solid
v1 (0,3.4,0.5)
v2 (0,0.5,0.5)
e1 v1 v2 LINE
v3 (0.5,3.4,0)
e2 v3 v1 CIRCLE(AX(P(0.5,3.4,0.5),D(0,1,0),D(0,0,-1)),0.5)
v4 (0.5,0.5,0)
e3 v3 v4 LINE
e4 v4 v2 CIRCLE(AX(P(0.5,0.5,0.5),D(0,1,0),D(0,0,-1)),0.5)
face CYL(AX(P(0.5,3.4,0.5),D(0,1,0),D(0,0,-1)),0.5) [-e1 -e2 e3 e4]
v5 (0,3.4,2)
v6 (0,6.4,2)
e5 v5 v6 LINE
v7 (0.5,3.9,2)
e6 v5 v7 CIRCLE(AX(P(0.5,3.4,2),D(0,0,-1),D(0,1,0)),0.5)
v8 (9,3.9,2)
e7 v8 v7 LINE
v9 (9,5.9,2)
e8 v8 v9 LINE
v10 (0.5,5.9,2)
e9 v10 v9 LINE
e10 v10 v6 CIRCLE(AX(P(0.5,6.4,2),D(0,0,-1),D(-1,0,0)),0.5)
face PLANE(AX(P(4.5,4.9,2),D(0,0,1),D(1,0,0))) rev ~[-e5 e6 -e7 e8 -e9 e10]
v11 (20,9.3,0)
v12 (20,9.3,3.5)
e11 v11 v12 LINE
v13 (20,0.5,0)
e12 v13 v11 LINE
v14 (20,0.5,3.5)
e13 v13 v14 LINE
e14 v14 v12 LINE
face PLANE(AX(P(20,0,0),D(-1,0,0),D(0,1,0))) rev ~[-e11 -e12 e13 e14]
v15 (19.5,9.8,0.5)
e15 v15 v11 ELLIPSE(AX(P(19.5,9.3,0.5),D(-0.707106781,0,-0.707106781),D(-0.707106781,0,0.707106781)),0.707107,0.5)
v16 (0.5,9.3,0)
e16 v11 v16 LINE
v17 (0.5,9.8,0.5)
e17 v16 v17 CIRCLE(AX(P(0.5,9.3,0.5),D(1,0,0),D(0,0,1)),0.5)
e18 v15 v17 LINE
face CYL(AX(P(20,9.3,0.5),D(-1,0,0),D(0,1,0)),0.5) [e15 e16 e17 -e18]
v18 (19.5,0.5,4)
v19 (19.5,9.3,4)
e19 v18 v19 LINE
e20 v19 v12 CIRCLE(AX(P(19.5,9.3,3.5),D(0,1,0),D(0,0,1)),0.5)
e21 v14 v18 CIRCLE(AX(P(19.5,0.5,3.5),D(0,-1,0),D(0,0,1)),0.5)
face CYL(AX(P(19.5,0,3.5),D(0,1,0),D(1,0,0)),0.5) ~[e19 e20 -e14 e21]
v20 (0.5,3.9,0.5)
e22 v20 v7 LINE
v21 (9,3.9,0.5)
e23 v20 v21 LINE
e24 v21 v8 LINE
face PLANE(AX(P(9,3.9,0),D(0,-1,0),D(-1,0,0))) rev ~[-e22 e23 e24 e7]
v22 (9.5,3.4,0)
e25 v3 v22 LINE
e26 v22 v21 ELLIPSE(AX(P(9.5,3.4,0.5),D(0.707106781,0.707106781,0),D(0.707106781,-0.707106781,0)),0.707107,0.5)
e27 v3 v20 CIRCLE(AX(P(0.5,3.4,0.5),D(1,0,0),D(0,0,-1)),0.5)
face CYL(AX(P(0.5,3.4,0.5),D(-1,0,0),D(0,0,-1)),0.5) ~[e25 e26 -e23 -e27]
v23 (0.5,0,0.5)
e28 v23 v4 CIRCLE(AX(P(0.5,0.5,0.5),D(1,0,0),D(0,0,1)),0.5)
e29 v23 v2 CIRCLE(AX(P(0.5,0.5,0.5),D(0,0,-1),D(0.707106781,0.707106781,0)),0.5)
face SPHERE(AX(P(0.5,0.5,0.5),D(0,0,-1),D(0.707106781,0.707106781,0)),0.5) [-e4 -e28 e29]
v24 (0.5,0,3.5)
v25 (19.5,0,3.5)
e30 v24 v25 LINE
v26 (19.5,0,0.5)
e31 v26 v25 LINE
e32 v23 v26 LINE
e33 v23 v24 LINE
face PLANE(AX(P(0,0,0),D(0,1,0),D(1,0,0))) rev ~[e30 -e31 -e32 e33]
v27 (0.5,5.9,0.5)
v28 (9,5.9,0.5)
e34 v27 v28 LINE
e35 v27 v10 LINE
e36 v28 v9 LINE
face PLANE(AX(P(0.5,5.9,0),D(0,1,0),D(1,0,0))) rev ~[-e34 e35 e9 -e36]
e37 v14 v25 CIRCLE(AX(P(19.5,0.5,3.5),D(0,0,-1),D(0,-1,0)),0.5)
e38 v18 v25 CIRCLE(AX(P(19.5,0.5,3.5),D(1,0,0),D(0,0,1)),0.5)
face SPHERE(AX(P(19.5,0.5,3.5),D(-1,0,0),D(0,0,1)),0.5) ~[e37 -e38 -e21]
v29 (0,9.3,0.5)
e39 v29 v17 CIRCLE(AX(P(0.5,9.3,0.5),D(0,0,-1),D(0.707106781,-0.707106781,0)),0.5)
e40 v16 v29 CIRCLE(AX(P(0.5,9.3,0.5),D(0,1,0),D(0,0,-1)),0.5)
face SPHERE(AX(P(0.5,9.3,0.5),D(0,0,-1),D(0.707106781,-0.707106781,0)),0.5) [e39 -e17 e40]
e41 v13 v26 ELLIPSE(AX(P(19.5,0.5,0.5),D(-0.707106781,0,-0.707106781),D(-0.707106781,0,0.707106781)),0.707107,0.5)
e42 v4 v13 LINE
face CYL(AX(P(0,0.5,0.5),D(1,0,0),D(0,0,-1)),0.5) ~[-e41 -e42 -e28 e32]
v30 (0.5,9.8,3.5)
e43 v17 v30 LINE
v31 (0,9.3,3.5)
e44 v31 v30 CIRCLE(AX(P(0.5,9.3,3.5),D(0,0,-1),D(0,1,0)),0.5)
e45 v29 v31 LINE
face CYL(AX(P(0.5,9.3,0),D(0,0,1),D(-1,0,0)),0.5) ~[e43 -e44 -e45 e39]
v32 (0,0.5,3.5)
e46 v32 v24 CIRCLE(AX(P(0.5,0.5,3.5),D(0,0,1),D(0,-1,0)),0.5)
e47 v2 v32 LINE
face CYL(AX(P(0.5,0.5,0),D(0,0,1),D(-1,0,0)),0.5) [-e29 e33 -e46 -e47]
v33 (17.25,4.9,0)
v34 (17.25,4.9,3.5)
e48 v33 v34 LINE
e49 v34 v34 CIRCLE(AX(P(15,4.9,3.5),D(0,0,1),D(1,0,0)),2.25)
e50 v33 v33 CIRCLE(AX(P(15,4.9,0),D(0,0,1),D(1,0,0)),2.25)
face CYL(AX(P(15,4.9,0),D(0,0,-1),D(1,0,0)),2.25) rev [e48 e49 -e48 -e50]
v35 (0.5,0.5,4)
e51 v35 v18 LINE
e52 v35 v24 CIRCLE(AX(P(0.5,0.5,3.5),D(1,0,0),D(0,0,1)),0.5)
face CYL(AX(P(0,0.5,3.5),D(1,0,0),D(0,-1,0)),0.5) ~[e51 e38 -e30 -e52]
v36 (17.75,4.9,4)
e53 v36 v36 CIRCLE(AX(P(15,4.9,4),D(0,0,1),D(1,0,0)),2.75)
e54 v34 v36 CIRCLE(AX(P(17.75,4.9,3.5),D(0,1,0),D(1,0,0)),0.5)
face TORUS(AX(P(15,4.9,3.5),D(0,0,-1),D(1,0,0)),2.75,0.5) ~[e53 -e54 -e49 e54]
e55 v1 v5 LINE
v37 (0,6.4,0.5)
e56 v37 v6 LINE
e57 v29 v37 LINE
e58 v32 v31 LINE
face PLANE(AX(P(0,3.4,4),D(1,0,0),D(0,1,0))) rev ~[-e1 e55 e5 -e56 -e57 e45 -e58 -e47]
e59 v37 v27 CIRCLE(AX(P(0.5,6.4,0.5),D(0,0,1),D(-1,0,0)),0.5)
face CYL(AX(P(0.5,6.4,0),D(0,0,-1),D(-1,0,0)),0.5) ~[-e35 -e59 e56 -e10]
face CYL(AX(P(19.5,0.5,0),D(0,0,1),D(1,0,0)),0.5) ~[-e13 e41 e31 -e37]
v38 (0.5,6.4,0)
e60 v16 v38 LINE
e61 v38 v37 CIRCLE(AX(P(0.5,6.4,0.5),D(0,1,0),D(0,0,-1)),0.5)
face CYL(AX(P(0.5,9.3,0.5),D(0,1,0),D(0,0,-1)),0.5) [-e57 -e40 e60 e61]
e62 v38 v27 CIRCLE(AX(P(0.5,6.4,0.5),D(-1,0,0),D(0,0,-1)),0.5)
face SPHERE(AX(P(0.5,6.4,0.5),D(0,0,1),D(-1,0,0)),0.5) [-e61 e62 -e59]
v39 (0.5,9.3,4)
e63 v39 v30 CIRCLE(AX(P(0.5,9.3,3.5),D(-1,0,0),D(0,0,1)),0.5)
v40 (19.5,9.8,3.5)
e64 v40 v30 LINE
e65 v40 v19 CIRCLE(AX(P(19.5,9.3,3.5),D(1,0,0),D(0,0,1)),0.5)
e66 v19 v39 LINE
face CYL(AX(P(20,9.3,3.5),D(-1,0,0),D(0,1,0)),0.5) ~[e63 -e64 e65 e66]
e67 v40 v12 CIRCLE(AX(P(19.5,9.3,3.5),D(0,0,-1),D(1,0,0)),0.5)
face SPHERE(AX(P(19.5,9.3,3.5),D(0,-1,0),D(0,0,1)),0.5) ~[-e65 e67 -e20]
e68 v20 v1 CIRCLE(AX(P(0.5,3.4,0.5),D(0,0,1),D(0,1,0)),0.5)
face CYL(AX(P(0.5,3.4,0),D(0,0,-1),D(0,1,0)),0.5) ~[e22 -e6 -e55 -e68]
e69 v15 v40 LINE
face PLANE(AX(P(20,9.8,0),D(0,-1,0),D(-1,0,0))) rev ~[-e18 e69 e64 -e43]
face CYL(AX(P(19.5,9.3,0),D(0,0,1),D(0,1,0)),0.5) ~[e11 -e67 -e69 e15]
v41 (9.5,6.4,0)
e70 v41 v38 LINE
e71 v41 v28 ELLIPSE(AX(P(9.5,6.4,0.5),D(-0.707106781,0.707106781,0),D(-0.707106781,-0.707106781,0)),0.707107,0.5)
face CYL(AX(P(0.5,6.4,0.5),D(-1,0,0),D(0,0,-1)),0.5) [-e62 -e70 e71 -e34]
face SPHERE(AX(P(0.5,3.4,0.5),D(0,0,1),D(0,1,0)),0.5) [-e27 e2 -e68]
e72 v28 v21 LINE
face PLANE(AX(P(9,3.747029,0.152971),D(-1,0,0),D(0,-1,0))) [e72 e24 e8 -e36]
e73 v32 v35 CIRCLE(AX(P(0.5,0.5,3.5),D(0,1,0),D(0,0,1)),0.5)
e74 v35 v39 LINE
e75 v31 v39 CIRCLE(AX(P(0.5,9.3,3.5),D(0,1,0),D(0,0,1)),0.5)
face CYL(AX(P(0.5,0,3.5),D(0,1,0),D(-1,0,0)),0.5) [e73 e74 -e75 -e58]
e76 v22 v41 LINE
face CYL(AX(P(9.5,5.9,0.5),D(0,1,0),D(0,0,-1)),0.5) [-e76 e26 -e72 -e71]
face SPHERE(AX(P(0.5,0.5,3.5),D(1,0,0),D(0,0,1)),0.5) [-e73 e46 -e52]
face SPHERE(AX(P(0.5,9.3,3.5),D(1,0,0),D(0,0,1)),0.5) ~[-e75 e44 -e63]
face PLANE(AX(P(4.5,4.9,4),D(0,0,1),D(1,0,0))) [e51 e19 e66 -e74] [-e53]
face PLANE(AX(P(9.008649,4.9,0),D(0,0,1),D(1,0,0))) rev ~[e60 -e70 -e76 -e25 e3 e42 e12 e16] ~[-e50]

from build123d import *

# Parameters (mm, degrees)
F0_R         = 2.25
F1_DEPTH     = 4
F2_W         = 9
F2_H         = 3
F3_DEPTH     = 2
F4_R         = 0.5
F5_T1_DEPTH  = 8.5
F5_T3_DEPTH  = 2
F5_T5_DEPTH  = 2.9
F5_T7_DEPTH  = 2.9
F5_S11_W     = 0.5
F5_S11_H     = 0.5
F5_T12_DEPTH = 0.5
F5_S17_W     = 0.5
F5_S17_H     = 0.5
F5_T18_DEPTH = 0.5
F5_T22_ANGLE = 90
F5_T24_ANGLE = 90
F5_T29_DEPTH = 9.75
F5_T33_DEPTH = 3.25
F5_T40_DEPTH = 9.75
F5_T44_DEPTH = 3.25


# Not quite as in the source:
# - a fillet or chamfer that OpenCascade refuses, or shapes differently, is made with other operations: its cross-section is extruded or revolved along the edge and cut away or added


with BuildPart() as f1:
    # F0 (on Top) → F1 (new body)
    with BuildSketch(Plane.XY):
        with BuildLine():
            Line((20, 0), (20, 9.8))
            Line((20, 9.8), (0, 9.8))
            Line((0, 9.8), (0, 6.4))
            ThreePointArc((0, 6.4), (0.1464466094, 6.0464466094), (0.5, 5.9))
            Line((0.5, 5.9), (9, 5.9))
            Line((9, 5.9), (9, 3.9))
            Line((9, 3.9), (0.5, 3.9))
            ThreePointArc((0.5, 3.9), (0.1464466094, 3.7535533906), (0, 3.4))
            Line((0, 3.4), (0, 0))
            Line((0, 0), (20, 0))
        make_face()
        with Locations((15, 4.9)):
            Circle(F0_R, mode=Mode.SUBTRACT)
    extrude(amount=F1_DEPTH)

    # F2 (on face) → F3 (join)
    with BuildSketch(Plane.XY.offset(4)):
        with Locations((4.5, 4.9)):
            Rectangle(F2_W, F2_H)
    extrude(amount=-F3_DEPTH)

    # F4
    f4_edges = [f1.edges().sort_by_distance(p)[0] for p in [
        (10, 0, 4),
        (20, 4.9, 4),
        (10, 9.8, 4),
        (0, 4.9, 4),
        (12.75, 4.9, 4),
        (20, 9.8, 2),
        (0, 9.8, 2),
        (10, 9.8, 0),
        (0, 0, 2),
        (20, 0, 2),
        (10, 0, 0),
    ]]
    fillet(f4_edges, radius=F4_R)

    # F5: fillet of radius 0.5 on 3 edges, made by hand

    # F5_s2 → F5_t1 (cut)
    with BuildSketch(Plane.YZ.offset(0.5)):
        with BuildLine():
            ThreePointArc((6.4, 0), (6.0464466094, 0.1464466094), (5.9, 0.5))
            Line((5.9, 0.5), (5.9, 0))
            Line((5.9, 0), (6.4, 0))
        make_face()
        with BuildLine():
            ThreePointArc((3.4, 0), (3.7535533906, 0.1464466094), (3.9, 0.5))
            Line((3.9, 0.5), (3.9, 0))
            Line((3.9, 0), (3.4, 0))
        make_face()
    extrude(amount=F5_T1_DEPTH, mode=Mode.SUBTRACT)

    # F5_s4 → F5_t3 (cut)
    with BuildSketch(Plane.XZ.offset(-5.9)):
        with BuildLine():
            ThreePointArc((9.5, 0), (9.1464466094, 0.1464466094), (9, 0.5))
            Line((9, 0.5), (9, 0))
            Line((9, 0), (9.5, 0))
        make_face()
    extrude(amount=F5_T3_DEPTH, mode=Mode.SUBTRACT)

    # F5_s6 → F5_t5 (cut)
    with BuildSketch(Plane.XZ.offset(-3.4)):
        with BuildLine():
            ThreePointArc((0.5, 0), (0.1464466094, 0.1464466094), (0, 0.5))
            Line((0, 0.5), (0, 0))
            Line((0, 0), (0.5, 0))
        make_face()
    extrude(amount=F5_T5_DEPTH, mode=Mode.SUBTRACT)

    # F5_s8 → F5_t7 (cut)
    with BuildSketch(Plane.XZ.offset(-9.3)):
        with BuildLine():
            ThreePointArc((0.5, 0), (0.1464466094, 0.1464466094), (0, 0.5))
            Line((0, 0.5), (0, 0))
            Line((0, 0), (0.5, 0))
        make_face()
    extrude(amount=F5_T7_DEPTH, mode=Mode.SUBTRACT)


with BuildPart() as f5_tool10:
    # F5_s11 → F5_t12 (new body)
    with BuildSketch(Plane.XY.offset(0.5)):
        with Locations((0.25, 0.25)):
            Rectangle(F5_S11_W, F5_S11_H)
    extrude(amount=-F5_T12_DEPTH)

    # F5_s13 → F5_t14 (revolve, cut)
    with BuildSketch(Plane(origin=(0.5, 0.5, 0.5), x_dir=(0.7071067812, 0.7071067812, 0), z_dir=(-0.7071067812, 0.7071067812, 0))):
        with BuildLine():
            ThreePointArc((0, -0.5), (0.5, 0), (0, 0.5))
            Line((0, 0.5), (0, -0.5))
        make_face()
    revolve(axis=Axis((0.5, 0.5, 0.5), (0, 0, -1)), mode=Mode.SUBTRACT)


with BuildPart() as f1_1:
    add(f1.part)

    # F5_t9: cut F5_tool10
    add(f5_tool10.part, mode=Mode.SUBTRACT)


with BuildPart() as f5_tool16:
    # F5_s17 → F5_t18 (new body)
    with BuildSketch(Plane.XY.offset(0.5)):
        with Locations((0.25, 9.55)):
            Rectangle(F5_S17_W, F5_S17_H)
    extrude(amount=-F5_T18_DEPTH)

    # F5_s19 → F5_t20 (revolve, cut)
    with BuildSketch(Plane(origin=(0.5, 9.3, 0.5), x_dir=(0.7071067812, -0.7071067812, 0), z_dir=(0.7071067812, 0.7071067812, 0))):
        with BuildLine():
            ThreePointArc((0, -0.5), (0.5, 0), (0, 0.5))
            Line((0, 0.5), (0, -0.5))
        make_face()
    revolve(axis=Axis((0.5, 9.3, 0.5), (0, 0, -1)), mode=Mode.SUBTRACT)


with BuildPart() as f1_2:
    add(f1_1.part)

    # F5_t15: cut F5_tool16
    add(f5_tool16.part, mode=Mode.SUBTRACT)

    # F5_s21 → F5_t22 (revolve, cut)
    with BuildSketch(Plane.YZ.offset(0.5)):
        with BuildLine():
            ThreePointArc((3.4, 0), (3.7535533906, 0.1464466094), (3.9, 0.5))
            Line((3.9, 0.5), (3.9, 0))
            Line((3.9, 0), (3.4, 0))
        make_face()
    revolve(axis=Axis((0.5, 3.4, 0), (0, 0, 1)), revolution_arc=F5_T22_ANGLE, mode=Mode.SUBTRACT)

    # F5_s23 → F5_t24 (revolve, cut)
    with BuildSketch(Plane.XZ.offset(-6.4)):
        with BuildLine():
            ThreePointArc((0.5, 0), (0.1464466094, 0.1464466094), (0, 0.5))
            Line((0, 0.5), (0, 0))
            Line((0, 0), (0.5, 0))
        make_face()
    revolve(axis=Axis((0.5, 6.4, 0), (0, 0, 1)), revolution_arc=F5_T24_ANGLE, mode=Mode.SUBTRACT)


with BuildPart() as f5_tool27:
    # F5_s28 → F5_t29 (new body)
    with BuildSketch(Plane.YZ.offset(0.5)):
        with BuildLine():
            ThreePointArc((6.4, 0), (6.0464466094, 0.1464466094), (5.9, 0.5))
            Line((5.9, 0.5), (5.9, 0))
            Line((5.9, 0), (6.4, 0))
        make_face()
    extrude(amount=F5_T29_DEPTH)

    split(bisect_by=Plane.YZ.offset(9), keep=Keep.TOP)


with BuildPart() as f5_tool31:
    # F5_s32 → F5_t33 (new body)
    with BuildSketch(Plane.XZ.offset(-7.15)):
        with BuildLine():
            ThreePointArc((9.5, 0), (9.1464466094, 0.1464466094), (9, 0.5))
            Line((9, 0.5), (9, 0))
            Line((9, 0), (9.5, 0))
        make_face()
    extrude(amount=F5_T33_DEPTH)

    split(bisect_by=Plane.XZ.offset(-5.9), keep=Keep.BOTTOM)


with BuildPart() as f5_tool27_1:
    add(f5_tool27.part)

    # F5_t35: intersect F5_tool31
    add(f5_tool31.part, mode=Mode.INTERSECT)


with BuildPart() as f1_3:
    add(f1_2.part)

    # F5_t25: cut F5_tool27
    add(f5_tool27_1.part, mode=Mode.SUBTRACT)


with BuildPart() as f5_tool38:
    # F5_s39 → F5_t40 (new body)
    with BuildSketch(Plane.YZ.offset(10.25)):
        with BuildLine():
            ThreePointArc((3.4, 0), (3.7535533906, 0.1464466094), (3.9, 0.5))
            Line((3.9, 0.5), (3.9, 0))
            Line((3.9, 0), (3.4, 0))
        make_face()
    extrude(amount=-F5_T40_DEPTH)

    split(bisect_by=Plane.YZ.offset(9), keep=Keep.TOP)


with BuildPart() as f5_tool42:
    # F5_s43 → F5_t44 (new body)
    with BuildSketch(Plane.XZ.offset(-5.9)):
        with BuildLine():
            ThreePointArc((9.5, 0), (9.1464466094, 0.1464466094), (9, 0.5))
            Line((9, 0.5), (9, 0))
            Line((9, 0), (9.5, 0))
        make_face()
    extrude(amount=F5_T44_DEPTH)

    split(bisect_by=Plane.XZ.offset(-3.9), keep=Keep.TOP)


with BuildPart() as f5_tool38_1:
    add(f5_tool38.part)

    # F5_t46: intersect F5_tool42
    add(f5_tool42.part, mode=Mode.INTERSECT)


with BuildPart() as f1_4:
    add(f1_3.part)

    # F5_t36: cut F5_tool38
    add(f5_tool38_1.part, mode=Mode.SUBTRACT)


solid = f1_4.part
